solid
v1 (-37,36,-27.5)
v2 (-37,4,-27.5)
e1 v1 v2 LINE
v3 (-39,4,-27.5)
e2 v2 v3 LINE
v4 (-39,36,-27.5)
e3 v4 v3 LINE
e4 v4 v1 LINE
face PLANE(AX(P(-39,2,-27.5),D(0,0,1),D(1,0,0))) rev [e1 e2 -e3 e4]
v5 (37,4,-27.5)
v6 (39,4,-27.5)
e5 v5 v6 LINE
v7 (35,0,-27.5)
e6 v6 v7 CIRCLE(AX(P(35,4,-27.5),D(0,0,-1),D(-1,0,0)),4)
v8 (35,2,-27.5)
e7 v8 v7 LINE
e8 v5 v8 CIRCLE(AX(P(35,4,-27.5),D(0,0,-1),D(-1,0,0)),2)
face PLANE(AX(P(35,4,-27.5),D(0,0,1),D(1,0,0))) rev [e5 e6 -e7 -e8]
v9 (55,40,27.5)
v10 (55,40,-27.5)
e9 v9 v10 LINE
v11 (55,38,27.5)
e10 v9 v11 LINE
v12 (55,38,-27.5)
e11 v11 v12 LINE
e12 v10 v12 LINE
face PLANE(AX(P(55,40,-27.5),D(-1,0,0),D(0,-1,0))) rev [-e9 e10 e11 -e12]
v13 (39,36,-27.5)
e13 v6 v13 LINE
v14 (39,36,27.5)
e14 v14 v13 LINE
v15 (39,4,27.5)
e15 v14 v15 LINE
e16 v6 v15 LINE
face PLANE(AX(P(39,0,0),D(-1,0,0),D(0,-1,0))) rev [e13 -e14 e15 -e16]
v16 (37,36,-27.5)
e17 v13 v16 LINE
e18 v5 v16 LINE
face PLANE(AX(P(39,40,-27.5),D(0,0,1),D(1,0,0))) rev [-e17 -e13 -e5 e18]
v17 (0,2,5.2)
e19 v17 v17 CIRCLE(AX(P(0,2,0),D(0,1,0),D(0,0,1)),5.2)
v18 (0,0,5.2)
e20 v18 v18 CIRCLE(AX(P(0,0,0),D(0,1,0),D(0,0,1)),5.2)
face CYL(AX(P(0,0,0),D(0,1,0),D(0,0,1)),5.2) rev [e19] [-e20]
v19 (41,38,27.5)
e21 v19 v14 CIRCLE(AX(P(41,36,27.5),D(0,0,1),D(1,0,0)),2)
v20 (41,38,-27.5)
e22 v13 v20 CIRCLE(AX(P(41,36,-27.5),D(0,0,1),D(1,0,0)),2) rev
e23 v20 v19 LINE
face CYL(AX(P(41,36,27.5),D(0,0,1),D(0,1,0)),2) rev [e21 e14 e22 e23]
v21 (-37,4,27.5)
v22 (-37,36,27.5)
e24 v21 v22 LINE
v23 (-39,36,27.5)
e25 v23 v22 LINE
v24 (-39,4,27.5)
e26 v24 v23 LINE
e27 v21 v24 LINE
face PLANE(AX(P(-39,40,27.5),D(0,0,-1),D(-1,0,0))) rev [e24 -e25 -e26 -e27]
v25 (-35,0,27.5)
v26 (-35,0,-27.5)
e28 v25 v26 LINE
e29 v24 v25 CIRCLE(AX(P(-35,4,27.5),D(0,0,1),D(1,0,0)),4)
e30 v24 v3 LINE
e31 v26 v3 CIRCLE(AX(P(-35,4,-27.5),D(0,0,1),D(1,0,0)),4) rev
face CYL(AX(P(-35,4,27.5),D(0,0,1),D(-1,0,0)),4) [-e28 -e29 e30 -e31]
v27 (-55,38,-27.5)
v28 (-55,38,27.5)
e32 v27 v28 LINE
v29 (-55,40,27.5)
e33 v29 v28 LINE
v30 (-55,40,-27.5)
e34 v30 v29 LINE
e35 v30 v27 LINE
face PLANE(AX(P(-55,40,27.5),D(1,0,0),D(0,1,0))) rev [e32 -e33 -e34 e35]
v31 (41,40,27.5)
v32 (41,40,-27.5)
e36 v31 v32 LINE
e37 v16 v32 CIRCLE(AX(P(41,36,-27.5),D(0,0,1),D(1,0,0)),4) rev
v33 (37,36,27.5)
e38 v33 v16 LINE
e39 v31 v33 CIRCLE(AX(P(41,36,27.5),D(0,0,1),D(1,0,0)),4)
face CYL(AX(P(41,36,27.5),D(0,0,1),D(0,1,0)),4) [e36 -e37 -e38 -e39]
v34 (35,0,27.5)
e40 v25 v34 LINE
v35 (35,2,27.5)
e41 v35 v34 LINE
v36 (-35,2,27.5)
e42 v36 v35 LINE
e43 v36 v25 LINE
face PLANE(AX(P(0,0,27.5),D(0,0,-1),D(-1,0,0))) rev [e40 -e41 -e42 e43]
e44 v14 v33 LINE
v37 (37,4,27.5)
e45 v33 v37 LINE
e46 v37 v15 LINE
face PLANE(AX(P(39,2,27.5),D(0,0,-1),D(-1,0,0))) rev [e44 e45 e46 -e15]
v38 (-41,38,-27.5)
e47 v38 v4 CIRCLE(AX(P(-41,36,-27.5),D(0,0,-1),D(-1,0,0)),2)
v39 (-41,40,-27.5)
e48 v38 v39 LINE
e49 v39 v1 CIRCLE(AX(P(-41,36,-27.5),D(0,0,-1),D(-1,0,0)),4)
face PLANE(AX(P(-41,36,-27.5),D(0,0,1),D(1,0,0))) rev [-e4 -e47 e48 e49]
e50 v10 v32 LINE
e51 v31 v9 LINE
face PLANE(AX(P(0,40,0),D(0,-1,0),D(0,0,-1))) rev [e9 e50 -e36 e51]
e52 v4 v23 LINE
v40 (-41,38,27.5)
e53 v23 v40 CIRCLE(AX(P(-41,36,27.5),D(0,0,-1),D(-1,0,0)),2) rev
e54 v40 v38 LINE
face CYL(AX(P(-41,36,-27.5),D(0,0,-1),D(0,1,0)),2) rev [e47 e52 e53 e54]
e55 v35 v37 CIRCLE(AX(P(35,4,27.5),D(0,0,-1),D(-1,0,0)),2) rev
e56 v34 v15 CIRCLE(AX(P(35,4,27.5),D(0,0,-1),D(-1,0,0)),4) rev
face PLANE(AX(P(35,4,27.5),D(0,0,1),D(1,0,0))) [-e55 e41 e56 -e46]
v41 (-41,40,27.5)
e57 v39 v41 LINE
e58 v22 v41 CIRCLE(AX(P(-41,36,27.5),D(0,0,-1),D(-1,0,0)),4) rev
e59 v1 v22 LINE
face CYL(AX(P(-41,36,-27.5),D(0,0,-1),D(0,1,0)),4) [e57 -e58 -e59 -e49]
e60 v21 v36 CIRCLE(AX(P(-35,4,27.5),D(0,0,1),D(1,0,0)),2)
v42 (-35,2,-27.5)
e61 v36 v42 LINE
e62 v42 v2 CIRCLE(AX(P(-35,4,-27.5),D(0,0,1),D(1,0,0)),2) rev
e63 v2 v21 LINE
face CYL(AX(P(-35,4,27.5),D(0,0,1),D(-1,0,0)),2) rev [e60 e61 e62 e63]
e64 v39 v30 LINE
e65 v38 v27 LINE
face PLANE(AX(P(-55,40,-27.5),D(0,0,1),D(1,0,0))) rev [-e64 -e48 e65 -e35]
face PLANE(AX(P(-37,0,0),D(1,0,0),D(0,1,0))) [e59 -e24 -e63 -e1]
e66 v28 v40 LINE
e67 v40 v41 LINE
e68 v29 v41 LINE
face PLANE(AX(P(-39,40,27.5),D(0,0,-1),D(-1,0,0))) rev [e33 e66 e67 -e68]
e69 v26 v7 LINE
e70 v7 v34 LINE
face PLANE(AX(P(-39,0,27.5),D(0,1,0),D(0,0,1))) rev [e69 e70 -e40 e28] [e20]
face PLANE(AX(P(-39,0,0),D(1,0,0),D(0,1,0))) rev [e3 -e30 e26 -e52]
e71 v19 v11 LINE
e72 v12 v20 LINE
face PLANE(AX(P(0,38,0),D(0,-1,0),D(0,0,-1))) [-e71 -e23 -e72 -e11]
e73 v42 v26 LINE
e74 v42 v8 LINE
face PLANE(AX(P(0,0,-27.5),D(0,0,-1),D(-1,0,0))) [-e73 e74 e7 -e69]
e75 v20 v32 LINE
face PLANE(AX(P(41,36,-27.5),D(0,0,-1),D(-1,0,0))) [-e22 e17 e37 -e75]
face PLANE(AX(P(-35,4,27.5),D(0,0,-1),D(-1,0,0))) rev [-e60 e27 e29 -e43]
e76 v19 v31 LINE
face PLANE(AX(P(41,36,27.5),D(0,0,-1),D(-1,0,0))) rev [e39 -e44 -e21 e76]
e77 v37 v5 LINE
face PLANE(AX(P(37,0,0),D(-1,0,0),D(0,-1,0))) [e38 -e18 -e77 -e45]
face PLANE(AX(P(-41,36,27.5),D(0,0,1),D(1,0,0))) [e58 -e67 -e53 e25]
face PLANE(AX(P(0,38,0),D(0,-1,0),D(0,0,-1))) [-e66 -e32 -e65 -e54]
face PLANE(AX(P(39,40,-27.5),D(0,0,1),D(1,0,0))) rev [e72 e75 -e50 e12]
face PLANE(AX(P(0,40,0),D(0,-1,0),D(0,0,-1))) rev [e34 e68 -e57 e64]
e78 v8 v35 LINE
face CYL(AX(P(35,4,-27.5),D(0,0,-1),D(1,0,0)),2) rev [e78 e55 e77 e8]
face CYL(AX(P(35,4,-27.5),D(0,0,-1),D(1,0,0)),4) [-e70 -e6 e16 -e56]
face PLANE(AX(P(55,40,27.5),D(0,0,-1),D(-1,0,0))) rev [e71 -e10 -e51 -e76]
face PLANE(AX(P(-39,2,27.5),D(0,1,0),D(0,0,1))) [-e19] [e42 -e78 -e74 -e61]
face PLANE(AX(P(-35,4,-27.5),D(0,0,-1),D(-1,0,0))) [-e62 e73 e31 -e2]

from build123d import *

# Parameters (mm, degrees)
SKETCH1_W                      = 78
SKETCH1_H                      = 2
BASE_FLANGE1_DEPTH             = 27.5
EDGE_FLANGE1_STRIP_W           = 12
EDGE_FLANGE1_STRIP_H           = 2
EDGE_FLANGE1_STRIP_CUT_DEPTH   = 55
EDGE_FLANGE1_STRIP_2_W         = 12
EDGE_FLANGE1_STRIP_2_H         = 2
EDGE_FLANGE1_STRIP_CUT_2_DEPTH = 55
EDGE_FLANGE1_DEPTH             = 55
EDGE_FLANGE1_BEND_DEPTH        = 55
EDGE_FLANGE2_STRIP_W           = 12
EDGE_FLANGE2_STRIP_H           = 2
EDGE_FLANGE2_STRIP_CUT_DEPTH   = 55
EDGE_FLANGE2_STRIP_2_W         = 12
EDGE_FLANGE2_STRIP_2_H         = 2
EDGE_FLANGE2_STRIP_CUT_2_DEPTH = 55
EDGE_FLANGE2_DEPTH             = 55
EDGE_FLANGE2_BEND_DEPTH        = 55
SKETCH18_R                     = 5.2
CUT_EXTRUDE1_DEPTH             = 10


# Sheet-metal steps are written as plain solids
with BuildPart() as part:
    # Sketch1 → Base-Flange1 (new, symmetric)
    with BuildSketch(Plane.XY):
        with Locations((0, 1)):
            Rectangle(SKETCH1_W, SKETCH1_H)
    extrude(amount=BASE_FLANGE1_DEPTH, both=True)

    # Edge-Flange1 strip (across the edge) → Edge-Flange1 strip cut (cut)
    with BuildSketch(Plane(origin=(-39, 2, -27.5), x_dir=(1, 0, 0), z_dir=(0, 0, 1))):
        with Locations((-2, -1)):
            Rectangle(EDGE_FLANGE1_STRIP_W, EDGE_FLANGE1_STRIP_H)
    extrude(amount=EDGE_FLANGE1_STRIP_CUT_DEPTH, mode=Mode.SUBTRACT)

    # Edge-Flange1 strip 2 (across the edge) → Edge-Flange1 strip cut 2 (cut)
    with BuildSketch(Plane(origin=(39, 2, 27.5), x_dir=(-1, 0, 0), z_dir=(0, 0, -1))):
        with Locations((-2, -1)):
            Rectangle(EDGE_FLANGE1_STRIP_2_W, EDGE_FLANGE1_STRIP_2_H)
    extrude(amount=EDGE_FLANGE1_STRIP_CUT_2_DEPTH, mode=Mode.SUBTRACT)

    # Edge-Flange1 section (across the edge) → Edge-Flange1 (add)
    with BuildSketch(Plane(origin=(-39, 2, -27.5), x_dir=(1, 0, 0), z_dir=(0, 0, 1))):
        with BuildLine():
            Line((0, 2), (0, 38))
            Line((0, 38), (2, 38))
            Line((2, 38), (2, 2))
            ThreePointArc((2, 2), (2.585786438, 0.585786438), (4, 0))
            Line((4, 0), (4, -2))
            ThreePointArc((4, -2), (1.171572875, -0.828427125), (0, 2))
        make_face()
    extrude(amount=EDGE_FLANGE1_DEPTH)

    # Edge-Flange1 section 2 (across the edge) → Edge-Flange1 bend (add)
    with BuildSketch(Plane(origin=(39, 2, 27.5), x_dir=(-1, 0, 0), z_dir=(0, 0, -1))):
        with BuildLine():
            Line((0, 2), (0, 38))
            Line((0, 38), (2, 38))
            Line((2, 38), (2, 2))
            ThreePointArc((2, 2), (2.585786438, 0.585786438), (4, 0))
            Line((4, 0), (4, -2))
            ThreePointArc((4, -2), (1.171572875, -0.828427125), (0, 2))
        make_face()
    extrude(amount=EDGE_FLANGE1_BEND_DEPTH)

    # Edge-Flange2 strip (across the edge) → Edge-Flange2 strip cut (cut)
    with BuildSketch(Plane(origin=(39, 40, -27.5), x_dir=(0, -1, 0), z_dir=(0, 0, 1))):
        with Locations((-2, -1)):
            Rectangle(EDGE_FLANGE2_STRIP_W, EDGE_FLANGE2_STRIP_H)
    extrude(amount=EDGE_FLANGE2_STRIP_CUT_DEPTH, mode=Mode.SUBTRACT)

    # Edge-Flange2 strip 2 (across the edge) → Edge-Flange2 strip cut 2 (cut)
    with BuildSketch(Plane(origin=(-39, 40, 27.5), x_dir=(0, -1, 0), z_dir=(0, 0, -1))):
        with Locations((-2, -1)):
            Rectangle(EDGE_FLANGE2_STRIP_2_W, EDGE_FLANGE2_STRIP_2_H)
    extrude(amount=EDGE_FLANGE2_STRIP_CUT_2_DEPTH, mode=Mode.SUBTRACT)

    # Edge-Flange2 section (across the edge) → Edge-Flange2 (add)
    with BuildSketch(Plane(origin=(39, 40, -27.5), x_dir=(0, -1, 0), z_dir=(0, 0, 1))):
        with BuildLine():
            Line((0, 2), (0, 16))
            Line((0, 16), (2, 16))
            Line((2, 16), (2, 2))
            ThreePointArc((2, 2), (2.585786438, 0.585786438), (4, 0))
            Line((4, 0), (4, -2))
            ThreePointArc((4, -2), (1.171572875, -0.828427125), (0, 2))
        make_face()
    extrude(amount=EDGE_FLANGE2_DEPTH)

    # Edge-Flange2 section 2 (across the edge) → Edge-Flange2 bend (add)
    with BuildSketch(Plane(origin=(-39, 40, 27.5), x_dir=(0, -1, 0), z_dir=(0, 0, -1))):
        with BuildLine():
            Line((0, 2), (0, 16))
            Line((0, 16), (2, 16))
            Line((2, 16), (2, 2))
            ThreePointArc((2, 2), (2.585786438, 0.585786438), (4, 0))
            Line((4, 0), (4, -2))
            ThreePointArc((4, -2), (1.171572875, -0.828427125), (0, 2))
        make_face()
    extrude(amount=EDGE_FLANGE2_BEND_DEPTH)

    # Sketch18 → Cut-Extrude1 (cut)
    with BuildSketch(Plane(origin=(0, 2, 0), x_dir=(1, 0, 0), z_dir=(0, 1, 0))):
        with Locations(Location((0, 0, 0), (0, 0, 270))):
            Circle(SKETCH18_R)
    extrude(amount=-CUT_EXTRUDE1_DEPTH, mode=Mode.SUBTRACT)


solid = part.part
